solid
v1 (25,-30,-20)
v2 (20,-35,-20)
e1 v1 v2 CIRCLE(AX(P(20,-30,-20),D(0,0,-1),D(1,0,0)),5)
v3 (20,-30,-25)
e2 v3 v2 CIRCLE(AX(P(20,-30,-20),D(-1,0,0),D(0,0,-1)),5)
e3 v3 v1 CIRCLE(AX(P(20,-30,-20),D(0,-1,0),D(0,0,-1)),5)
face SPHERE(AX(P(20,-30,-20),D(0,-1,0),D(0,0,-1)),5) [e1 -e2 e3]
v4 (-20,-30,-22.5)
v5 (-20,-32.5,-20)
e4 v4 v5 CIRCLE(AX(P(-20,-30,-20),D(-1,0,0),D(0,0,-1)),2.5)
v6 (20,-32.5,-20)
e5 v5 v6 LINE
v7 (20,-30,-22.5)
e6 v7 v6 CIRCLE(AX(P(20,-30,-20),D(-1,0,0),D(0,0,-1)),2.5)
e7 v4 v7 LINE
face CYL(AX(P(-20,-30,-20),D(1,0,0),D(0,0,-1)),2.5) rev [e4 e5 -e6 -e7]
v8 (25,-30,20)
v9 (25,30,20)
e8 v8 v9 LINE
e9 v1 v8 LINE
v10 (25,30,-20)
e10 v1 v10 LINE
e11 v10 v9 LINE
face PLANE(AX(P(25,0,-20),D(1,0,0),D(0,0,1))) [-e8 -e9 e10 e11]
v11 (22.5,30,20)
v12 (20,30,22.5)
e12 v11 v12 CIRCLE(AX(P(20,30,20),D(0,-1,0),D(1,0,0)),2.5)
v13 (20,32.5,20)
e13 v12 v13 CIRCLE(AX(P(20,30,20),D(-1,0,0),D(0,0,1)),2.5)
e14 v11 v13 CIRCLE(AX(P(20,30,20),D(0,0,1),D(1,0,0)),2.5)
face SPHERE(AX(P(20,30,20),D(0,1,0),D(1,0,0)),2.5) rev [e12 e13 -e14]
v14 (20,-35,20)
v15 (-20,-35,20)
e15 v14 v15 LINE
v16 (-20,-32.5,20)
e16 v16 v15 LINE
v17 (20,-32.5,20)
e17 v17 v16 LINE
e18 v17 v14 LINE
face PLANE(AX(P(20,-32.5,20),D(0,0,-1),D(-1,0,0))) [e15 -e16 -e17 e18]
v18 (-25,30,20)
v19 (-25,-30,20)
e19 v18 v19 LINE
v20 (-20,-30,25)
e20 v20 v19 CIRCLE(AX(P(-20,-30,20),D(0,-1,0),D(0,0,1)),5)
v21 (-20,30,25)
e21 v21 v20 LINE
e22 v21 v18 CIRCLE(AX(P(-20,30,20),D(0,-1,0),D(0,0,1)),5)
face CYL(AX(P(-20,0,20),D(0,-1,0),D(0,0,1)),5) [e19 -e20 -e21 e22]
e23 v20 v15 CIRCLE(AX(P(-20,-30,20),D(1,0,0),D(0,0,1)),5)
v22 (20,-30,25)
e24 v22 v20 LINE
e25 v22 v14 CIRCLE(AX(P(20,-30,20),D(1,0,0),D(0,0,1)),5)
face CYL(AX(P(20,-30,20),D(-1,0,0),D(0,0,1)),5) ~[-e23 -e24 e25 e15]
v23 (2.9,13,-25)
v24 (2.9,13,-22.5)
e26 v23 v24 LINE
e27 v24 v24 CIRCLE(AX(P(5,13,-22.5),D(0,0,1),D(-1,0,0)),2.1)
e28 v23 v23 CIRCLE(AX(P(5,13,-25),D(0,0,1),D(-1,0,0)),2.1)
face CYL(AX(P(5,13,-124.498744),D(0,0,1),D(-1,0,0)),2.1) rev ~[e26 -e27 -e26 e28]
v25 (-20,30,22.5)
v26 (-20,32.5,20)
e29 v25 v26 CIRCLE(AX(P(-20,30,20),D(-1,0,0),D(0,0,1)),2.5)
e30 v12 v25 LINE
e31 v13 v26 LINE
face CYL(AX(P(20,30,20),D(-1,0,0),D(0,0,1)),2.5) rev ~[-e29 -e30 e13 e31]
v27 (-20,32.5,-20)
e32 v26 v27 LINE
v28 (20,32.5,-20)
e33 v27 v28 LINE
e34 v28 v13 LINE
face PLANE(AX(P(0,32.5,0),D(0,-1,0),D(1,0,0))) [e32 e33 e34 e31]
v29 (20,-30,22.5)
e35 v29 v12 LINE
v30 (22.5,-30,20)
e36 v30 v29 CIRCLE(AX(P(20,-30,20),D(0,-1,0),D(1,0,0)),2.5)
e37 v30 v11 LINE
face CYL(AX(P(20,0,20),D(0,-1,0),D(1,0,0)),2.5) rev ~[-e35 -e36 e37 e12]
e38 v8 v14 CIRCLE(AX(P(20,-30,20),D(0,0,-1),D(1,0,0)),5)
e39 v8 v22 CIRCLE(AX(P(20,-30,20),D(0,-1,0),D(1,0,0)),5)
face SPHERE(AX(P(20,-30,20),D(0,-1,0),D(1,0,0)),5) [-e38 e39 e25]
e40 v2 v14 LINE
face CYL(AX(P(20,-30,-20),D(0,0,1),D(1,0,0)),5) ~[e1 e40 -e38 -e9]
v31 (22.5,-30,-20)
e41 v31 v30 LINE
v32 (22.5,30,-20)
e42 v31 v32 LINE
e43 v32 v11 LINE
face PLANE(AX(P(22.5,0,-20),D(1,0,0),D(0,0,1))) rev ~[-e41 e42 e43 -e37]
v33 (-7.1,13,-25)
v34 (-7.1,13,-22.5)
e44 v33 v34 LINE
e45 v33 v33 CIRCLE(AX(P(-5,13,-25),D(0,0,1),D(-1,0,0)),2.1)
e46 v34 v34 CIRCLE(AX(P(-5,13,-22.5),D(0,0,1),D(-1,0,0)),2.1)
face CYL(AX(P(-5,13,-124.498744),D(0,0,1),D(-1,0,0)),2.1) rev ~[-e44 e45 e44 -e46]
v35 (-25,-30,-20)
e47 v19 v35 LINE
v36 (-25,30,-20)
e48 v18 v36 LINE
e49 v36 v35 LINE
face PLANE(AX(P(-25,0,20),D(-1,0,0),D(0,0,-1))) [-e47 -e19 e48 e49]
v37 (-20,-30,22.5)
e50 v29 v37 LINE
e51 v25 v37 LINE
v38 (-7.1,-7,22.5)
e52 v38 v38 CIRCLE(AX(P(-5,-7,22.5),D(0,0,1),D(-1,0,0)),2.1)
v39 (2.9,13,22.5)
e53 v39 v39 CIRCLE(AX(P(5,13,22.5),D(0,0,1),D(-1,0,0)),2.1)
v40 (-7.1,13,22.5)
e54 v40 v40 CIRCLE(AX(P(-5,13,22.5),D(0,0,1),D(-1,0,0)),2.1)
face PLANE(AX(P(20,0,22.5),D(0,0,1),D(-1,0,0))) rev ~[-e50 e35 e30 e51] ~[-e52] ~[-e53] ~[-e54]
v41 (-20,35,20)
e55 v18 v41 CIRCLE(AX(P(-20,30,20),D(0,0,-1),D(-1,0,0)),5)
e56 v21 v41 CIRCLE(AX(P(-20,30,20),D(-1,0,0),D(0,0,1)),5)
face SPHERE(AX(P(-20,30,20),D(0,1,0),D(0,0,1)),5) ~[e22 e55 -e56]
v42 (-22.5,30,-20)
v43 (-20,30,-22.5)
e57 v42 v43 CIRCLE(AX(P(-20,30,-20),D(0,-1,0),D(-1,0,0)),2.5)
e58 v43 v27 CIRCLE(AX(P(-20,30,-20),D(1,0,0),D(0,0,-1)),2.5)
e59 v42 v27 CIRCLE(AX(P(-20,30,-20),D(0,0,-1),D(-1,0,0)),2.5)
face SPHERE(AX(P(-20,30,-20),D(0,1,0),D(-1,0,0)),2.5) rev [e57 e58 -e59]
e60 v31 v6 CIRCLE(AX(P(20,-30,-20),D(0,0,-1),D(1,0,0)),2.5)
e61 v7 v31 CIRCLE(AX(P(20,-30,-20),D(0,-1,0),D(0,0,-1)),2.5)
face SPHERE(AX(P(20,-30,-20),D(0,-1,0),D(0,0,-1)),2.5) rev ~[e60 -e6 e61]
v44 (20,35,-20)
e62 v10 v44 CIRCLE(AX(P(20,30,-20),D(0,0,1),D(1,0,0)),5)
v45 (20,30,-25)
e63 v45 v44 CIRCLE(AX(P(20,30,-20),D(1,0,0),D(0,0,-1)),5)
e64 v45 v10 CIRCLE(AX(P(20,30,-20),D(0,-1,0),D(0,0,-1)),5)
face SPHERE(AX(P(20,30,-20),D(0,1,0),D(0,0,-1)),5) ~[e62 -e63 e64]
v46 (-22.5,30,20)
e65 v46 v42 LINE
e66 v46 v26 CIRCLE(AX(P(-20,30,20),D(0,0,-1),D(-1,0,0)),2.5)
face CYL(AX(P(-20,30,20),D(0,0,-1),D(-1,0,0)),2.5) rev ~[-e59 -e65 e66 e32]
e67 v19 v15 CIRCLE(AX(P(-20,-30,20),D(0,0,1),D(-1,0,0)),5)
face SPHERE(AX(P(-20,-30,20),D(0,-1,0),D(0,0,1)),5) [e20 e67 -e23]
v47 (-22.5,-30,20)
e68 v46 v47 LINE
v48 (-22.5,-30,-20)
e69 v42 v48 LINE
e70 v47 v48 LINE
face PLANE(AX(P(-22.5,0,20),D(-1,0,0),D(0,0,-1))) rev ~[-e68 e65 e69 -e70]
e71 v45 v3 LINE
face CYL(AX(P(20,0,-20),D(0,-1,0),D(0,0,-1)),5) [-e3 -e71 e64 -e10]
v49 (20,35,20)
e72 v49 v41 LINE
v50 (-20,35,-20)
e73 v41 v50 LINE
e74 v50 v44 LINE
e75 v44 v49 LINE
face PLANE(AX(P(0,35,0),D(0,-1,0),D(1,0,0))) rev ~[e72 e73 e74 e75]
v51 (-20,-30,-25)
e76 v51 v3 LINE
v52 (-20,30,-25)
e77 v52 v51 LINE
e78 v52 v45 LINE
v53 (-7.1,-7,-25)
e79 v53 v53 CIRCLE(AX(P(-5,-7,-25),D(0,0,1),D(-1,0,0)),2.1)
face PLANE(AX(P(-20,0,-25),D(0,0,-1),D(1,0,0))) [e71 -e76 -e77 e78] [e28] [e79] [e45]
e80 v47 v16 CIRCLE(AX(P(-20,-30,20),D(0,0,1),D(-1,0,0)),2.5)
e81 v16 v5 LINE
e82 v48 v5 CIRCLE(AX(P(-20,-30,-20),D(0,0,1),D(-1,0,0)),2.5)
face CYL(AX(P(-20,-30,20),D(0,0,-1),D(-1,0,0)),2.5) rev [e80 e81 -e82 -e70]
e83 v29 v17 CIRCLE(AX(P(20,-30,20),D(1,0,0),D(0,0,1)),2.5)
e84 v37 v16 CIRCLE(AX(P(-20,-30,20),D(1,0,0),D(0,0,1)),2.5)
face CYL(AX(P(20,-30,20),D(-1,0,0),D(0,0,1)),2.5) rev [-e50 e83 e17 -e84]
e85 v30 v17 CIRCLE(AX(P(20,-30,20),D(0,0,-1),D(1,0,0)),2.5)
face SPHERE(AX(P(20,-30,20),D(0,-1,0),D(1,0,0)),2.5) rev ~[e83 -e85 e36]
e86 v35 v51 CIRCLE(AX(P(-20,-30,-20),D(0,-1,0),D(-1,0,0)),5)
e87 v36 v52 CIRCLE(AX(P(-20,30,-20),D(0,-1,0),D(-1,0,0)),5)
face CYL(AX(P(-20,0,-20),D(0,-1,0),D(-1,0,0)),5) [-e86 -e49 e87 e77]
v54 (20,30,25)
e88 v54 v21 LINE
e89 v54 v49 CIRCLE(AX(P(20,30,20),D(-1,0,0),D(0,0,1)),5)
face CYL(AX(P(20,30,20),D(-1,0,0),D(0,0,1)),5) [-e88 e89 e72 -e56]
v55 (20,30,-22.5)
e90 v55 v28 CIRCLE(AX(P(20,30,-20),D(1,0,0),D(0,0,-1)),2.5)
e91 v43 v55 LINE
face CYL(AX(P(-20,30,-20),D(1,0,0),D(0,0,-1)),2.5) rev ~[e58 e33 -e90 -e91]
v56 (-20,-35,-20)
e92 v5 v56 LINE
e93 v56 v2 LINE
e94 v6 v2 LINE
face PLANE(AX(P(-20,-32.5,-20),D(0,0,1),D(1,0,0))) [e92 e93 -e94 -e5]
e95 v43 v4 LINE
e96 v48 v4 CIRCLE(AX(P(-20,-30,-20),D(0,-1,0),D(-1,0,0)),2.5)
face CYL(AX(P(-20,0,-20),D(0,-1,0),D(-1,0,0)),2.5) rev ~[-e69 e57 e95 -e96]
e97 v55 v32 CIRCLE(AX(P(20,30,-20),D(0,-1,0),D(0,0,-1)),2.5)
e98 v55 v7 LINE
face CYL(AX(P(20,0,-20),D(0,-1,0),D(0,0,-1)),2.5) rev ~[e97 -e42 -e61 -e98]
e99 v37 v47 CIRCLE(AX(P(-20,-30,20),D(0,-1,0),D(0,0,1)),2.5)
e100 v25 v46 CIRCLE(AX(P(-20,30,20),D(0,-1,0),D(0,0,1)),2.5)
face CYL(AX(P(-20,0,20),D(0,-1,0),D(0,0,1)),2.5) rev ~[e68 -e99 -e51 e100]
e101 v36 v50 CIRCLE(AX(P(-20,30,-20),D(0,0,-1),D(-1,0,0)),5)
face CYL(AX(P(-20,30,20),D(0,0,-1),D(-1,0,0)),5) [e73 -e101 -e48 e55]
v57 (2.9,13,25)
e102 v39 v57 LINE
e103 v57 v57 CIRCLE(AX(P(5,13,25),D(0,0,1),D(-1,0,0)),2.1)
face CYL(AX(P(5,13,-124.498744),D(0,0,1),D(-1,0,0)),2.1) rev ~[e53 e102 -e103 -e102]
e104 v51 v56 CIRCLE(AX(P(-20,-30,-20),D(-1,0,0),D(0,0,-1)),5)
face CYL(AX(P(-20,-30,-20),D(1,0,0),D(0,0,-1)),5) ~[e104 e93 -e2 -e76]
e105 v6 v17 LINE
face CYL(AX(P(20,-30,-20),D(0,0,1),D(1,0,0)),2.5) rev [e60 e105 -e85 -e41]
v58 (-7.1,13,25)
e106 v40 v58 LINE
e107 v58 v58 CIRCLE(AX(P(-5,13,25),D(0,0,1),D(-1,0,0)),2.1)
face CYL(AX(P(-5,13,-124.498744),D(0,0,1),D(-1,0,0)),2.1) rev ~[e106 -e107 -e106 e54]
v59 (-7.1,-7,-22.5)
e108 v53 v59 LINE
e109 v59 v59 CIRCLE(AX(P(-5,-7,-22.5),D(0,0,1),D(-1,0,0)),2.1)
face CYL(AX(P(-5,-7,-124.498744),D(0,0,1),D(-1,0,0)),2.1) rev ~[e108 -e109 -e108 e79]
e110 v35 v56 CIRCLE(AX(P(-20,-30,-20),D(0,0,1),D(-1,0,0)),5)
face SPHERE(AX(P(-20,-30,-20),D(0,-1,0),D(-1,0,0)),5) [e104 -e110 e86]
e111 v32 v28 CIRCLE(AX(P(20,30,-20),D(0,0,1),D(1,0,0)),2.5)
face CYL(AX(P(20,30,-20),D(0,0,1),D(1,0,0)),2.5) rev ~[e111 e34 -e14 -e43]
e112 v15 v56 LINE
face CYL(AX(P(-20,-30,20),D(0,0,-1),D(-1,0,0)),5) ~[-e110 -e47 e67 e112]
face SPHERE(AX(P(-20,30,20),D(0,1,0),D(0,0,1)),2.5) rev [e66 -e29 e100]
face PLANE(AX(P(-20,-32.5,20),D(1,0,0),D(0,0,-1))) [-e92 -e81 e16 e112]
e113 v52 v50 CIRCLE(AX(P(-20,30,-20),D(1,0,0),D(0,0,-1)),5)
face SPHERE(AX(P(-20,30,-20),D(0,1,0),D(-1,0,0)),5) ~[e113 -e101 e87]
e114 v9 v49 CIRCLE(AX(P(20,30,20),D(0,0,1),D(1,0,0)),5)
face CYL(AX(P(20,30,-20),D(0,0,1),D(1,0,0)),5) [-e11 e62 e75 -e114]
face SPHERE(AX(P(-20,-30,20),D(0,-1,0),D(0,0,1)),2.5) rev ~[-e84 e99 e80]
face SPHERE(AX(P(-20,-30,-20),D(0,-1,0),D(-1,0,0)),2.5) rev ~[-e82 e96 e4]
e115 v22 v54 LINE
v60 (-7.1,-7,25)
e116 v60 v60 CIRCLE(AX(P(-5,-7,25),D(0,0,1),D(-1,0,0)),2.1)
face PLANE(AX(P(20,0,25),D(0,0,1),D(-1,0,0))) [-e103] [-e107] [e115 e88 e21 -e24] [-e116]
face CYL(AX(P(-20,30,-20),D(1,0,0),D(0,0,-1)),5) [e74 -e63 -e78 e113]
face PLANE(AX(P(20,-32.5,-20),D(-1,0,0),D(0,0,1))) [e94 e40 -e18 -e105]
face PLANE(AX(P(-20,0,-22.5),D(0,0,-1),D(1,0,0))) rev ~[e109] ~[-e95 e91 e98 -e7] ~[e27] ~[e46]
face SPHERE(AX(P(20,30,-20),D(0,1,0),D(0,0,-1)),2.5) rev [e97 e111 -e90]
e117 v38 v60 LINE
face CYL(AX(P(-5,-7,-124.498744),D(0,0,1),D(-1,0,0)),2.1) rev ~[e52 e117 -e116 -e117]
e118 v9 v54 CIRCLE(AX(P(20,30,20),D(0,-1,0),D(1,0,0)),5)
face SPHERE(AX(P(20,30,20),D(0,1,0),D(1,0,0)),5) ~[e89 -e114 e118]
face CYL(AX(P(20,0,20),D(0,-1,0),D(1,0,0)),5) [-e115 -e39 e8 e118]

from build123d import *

# Parameters (mm, degrees)
F1_DEPTH = 35
F2_R     = 5
F3_T     = -2.5
F5_D     = 4.2


# Not quite as in the source:
# - a shell that OpenCascade refuses in one call is made with other operations: the cavity is built on its own and cut out


with BuildPart() as f1:
    # F0 (on Front) → F1 (new body, symmetric)
    with BuildSketch(Plane.XZ):
        with BuildLine():
            Line((20, 25), (-20, 25))
            ThreePointArc((-20, 25), (-23.5355339059, 23.5355339059), (-25, 20))
            Line((-25, 20), (-25, -20))
            ThreePointArc((-25, -20), (-23.5355339059, -23.5355339059), (-20, -25))
            Line((-20, -25), (20, -25))
            ThreePointArc((20, -25), (23.5355339059, -23.5355339059), (25, -20))
            Line((25, -20), (25, 20))
            ThreePointArc((25, 20), (23.5355339059, 23.5355339059), (20, 25))
        make_face()
    extrude(amount=F1_DEPTH, both=True)

    # F2
    f2_edges = [f1.edges().sort_by_distance(p)[0] for p in [
        (0, 35, 25),
        (-23.535534, 35, 23.535534),
        (-25, 35, 0),
        (-23.535534, 35, -23.535534),
        (0, 35, -25),
        (23.535534, 35, -23.535534),
        (25, 35, 0),
        (23.535534, 35, 23.535534),
        (0, -35, 25),
        (-23.535534, -35, 23.535534),
        (-25, -35, 0),
        (-23.535534, -35, -23.535534),
        (0, -35, -25),
        (23.535534, -35, -23.535534),
        (25, -35, 0),
        (23.535534, -35, 23.535534),
    ]]
    fillet(f2_edges, radius=F2_R)

    # F3: a shell. OpenCascade refuses it in one call, so the cavity is built on its own and cut out:
    # the body offset inwards by the wall thickness, plus a prism from it out through each open face.
    f3_core = offset(f1.part, amount=F3_T, mode=Mode.PRIVATE)
    f3_exits = [f3_core.faces().sort_by_distance(p)[0] for p in [
        (0, -32.5, 0),
    ]]
    add(f3_core, mode=Mode.SUBTRACT)
    extrude(f3_exits, amount=-F3_T, mode=Mode.SUBTRACT)

    # F5 (through all)
    with Locations(Plane(origin=(0, 0, -25), x_dir=(1, 0, 0), z_dir=(0, 0, -1))):
        with Locations((5, -13), (-5, 7), (-5, -13)):
            Hole(F5_D / 2)


solid = f1.part
